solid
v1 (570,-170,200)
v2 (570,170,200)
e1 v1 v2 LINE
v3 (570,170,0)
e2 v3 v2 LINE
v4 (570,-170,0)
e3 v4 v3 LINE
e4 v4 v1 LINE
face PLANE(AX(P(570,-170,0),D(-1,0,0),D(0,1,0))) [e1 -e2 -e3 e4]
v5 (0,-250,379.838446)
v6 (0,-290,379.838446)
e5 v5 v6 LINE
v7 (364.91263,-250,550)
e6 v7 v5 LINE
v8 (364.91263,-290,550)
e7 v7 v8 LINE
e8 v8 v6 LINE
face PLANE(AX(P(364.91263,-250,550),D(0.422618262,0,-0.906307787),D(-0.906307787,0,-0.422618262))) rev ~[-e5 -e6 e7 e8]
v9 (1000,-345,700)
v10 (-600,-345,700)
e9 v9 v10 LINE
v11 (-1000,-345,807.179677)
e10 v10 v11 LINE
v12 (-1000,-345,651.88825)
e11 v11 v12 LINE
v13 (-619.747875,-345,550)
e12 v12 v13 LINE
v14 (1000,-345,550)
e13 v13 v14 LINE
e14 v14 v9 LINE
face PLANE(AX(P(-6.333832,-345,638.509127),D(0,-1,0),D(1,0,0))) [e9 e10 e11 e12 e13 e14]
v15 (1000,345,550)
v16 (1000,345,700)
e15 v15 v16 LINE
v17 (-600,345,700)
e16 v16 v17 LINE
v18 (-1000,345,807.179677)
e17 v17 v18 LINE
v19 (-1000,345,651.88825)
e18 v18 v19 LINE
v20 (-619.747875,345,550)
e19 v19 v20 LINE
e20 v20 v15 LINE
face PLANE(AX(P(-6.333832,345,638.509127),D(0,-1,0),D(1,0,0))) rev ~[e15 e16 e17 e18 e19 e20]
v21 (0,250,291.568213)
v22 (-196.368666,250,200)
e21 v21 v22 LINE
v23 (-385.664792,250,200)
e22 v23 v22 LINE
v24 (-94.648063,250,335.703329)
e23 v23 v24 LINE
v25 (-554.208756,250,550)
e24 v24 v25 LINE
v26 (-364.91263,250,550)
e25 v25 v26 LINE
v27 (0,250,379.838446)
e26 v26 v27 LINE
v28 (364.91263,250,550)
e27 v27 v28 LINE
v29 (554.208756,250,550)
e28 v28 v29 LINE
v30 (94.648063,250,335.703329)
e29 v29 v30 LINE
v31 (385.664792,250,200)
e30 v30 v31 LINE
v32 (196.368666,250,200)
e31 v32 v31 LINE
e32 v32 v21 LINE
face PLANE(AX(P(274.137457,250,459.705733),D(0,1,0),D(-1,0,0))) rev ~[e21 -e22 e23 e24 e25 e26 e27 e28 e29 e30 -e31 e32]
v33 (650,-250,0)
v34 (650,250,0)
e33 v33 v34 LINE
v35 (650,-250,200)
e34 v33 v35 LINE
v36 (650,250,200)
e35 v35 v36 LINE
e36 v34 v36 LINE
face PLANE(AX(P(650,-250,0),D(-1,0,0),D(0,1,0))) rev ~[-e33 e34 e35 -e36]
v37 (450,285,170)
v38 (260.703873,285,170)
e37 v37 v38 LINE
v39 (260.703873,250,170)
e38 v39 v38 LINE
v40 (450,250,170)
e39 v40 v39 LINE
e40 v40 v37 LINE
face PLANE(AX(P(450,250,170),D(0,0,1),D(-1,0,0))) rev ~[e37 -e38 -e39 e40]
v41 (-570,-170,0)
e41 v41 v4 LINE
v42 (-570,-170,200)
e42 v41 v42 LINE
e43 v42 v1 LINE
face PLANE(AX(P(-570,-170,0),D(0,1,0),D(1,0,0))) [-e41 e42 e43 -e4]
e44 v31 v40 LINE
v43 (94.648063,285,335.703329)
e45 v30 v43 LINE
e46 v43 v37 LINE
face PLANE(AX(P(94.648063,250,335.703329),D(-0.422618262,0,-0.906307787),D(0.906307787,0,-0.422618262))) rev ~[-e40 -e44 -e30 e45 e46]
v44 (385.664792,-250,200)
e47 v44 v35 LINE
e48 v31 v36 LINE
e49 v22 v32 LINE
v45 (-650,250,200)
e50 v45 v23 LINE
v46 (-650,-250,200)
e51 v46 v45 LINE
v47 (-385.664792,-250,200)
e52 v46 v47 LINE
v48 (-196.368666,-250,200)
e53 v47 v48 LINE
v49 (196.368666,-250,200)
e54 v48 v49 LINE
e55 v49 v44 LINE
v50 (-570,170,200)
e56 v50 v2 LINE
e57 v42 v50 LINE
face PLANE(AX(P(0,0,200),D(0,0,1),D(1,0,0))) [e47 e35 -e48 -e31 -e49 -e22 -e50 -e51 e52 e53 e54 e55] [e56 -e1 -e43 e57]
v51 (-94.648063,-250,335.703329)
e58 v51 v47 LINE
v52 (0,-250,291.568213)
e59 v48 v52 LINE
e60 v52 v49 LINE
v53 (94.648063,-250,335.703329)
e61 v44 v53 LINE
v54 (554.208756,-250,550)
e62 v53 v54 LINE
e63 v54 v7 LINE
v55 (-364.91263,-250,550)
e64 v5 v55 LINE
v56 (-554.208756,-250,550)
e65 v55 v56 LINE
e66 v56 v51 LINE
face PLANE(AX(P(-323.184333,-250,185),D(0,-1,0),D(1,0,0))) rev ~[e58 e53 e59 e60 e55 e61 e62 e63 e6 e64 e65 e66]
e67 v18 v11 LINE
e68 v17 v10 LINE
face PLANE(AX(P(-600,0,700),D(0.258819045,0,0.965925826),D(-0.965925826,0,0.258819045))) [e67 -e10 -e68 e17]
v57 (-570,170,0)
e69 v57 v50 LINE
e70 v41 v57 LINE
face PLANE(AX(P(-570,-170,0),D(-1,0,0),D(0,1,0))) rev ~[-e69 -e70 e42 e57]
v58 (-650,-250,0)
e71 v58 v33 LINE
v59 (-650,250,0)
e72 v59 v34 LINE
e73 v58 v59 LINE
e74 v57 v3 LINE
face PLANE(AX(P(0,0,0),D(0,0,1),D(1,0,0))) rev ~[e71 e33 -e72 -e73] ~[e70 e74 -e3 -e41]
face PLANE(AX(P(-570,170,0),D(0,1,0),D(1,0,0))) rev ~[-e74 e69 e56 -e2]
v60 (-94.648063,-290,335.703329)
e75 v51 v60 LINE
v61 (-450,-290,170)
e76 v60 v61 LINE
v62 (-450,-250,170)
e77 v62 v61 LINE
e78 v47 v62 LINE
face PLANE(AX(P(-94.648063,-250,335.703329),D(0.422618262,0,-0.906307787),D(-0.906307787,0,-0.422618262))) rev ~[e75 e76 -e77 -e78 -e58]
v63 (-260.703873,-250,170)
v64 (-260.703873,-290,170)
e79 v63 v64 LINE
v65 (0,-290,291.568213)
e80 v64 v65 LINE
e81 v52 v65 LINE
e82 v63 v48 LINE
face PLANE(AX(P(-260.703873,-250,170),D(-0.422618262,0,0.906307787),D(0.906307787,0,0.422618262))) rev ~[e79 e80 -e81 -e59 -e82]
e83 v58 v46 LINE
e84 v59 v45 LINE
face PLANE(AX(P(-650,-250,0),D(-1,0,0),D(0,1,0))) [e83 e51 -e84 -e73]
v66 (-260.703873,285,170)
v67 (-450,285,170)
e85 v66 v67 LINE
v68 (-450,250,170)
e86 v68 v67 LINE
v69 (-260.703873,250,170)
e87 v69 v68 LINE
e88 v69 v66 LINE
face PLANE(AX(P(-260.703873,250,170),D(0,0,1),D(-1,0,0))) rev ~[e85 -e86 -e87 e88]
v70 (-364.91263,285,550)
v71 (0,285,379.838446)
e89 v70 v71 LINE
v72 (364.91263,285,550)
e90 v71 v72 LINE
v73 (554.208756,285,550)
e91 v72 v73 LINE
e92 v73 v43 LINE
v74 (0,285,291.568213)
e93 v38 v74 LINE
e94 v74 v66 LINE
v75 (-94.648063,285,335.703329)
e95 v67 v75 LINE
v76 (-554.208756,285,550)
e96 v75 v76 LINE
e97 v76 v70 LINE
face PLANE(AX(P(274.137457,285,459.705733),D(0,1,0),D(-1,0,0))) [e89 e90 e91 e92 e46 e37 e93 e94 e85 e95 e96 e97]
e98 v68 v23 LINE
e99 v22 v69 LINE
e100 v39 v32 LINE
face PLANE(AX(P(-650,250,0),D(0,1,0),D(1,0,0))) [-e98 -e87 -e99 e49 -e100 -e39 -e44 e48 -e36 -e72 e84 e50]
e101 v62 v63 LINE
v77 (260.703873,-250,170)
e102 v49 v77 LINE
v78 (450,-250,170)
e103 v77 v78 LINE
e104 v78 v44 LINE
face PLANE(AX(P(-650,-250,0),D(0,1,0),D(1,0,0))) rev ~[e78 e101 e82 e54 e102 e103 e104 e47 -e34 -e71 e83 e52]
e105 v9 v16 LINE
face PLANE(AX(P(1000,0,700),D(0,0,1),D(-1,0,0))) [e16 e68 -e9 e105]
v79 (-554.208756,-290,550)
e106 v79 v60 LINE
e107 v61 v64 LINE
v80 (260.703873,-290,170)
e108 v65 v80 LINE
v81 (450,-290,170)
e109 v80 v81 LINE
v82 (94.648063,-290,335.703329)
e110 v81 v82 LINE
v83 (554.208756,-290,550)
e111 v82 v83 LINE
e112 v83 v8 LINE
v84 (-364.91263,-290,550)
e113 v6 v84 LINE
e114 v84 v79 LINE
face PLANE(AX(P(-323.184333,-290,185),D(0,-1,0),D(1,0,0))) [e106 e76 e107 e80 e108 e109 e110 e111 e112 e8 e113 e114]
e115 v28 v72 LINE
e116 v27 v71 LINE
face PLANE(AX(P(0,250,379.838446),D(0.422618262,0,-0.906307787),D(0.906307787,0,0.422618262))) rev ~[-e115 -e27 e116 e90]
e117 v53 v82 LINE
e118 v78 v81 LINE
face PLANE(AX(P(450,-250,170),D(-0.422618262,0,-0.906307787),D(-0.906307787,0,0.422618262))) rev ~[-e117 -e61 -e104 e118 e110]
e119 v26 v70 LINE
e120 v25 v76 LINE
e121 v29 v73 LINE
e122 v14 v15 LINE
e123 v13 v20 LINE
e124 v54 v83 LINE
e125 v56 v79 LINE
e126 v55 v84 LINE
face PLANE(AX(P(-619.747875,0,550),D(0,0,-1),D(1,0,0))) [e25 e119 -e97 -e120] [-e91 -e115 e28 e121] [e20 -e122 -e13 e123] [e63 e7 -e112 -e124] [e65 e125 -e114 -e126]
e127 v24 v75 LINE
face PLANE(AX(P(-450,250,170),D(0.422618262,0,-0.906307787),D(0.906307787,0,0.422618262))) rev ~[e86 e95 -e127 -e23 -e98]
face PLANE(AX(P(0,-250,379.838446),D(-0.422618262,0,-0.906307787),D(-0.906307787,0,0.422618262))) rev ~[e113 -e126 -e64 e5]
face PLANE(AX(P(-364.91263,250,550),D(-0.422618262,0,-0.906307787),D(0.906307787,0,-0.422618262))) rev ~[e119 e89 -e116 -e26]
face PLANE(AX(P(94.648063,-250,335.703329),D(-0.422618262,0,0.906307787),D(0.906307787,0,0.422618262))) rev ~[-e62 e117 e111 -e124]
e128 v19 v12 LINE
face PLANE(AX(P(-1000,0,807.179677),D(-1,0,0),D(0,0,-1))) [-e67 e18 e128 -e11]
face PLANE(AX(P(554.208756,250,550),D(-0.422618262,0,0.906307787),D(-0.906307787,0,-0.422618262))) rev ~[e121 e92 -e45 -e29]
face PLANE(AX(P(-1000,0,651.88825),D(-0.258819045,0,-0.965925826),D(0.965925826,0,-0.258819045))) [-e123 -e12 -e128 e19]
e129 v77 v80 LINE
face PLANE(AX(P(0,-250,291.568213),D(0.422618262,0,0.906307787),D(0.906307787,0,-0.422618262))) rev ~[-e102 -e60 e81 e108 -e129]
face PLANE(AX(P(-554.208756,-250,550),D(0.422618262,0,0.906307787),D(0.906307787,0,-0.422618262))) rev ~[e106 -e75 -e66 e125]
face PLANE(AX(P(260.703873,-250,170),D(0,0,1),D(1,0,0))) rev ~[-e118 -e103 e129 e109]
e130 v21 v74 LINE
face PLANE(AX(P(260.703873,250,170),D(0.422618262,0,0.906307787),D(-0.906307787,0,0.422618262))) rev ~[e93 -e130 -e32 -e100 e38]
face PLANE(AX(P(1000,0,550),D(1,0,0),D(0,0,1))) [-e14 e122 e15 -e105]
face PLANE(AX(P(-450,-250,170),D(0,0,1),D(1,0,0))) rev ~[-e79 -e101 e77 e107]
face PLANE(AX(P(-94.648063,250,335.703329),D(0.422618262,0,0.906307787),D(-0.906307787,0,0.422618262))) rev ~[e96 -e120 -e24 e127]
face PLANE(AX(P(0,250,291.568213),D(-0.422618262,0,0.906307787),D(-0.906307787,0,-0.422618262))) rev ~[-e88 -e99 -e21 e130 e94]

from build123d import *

# Parameters (mm, degrees)
F0_W     = 1300
F0_H     = 500
F0_W_2   = 1140
F0_H_2   = 340
F1_DEPTH = 200
F3_DEPTH = 345
F5_DEPTH = 40
F7_DEPTH = 35


# Not quite as in the source:
# - a feature names something its author has since deleted; it is built from what else it names


with BuildPart() as f1:
    # F0 (on Top) → F1 (new body)
    with BuildSketch(Plane.XY):
        Rectangle(F0_W, F0_H)
        Rectangle(F0_W_2, F0_H_2, mode=Mode.SUBTRACT)
    extrude(amount=F1_DEPTH)



with BuildPart() as f3:
    # F2 (on Front) → F3 (new body, symmetric)
    with BuildSketch(Plane.XZ):
        Polygon((1000, 700), (-600, 700), (-1000, 807.1796769724), (-1000, 651.8882499109), (-619.7478746381, 550), (1000, 550), align=None)
    extrude(amount=F3_DEPTH, both=True)


with BuildPart() as f1_1:
    add(f1.part)

    add(f3.part)  # F5 merges F3
    # F4 (on face) → F5 (join)
    with BuildSketch(Plane.XZ.offset(250)):
        Polygon((-385.6647923847, 200), (-450, 170), (-260.7038733478, 170), (-196.3686657325, 200), align=None)
        Polygon((-94.6480633261, 335.7033294112), (-385.6647923847, 200), (-196.3686657325, 200), (0, 291.5682126528), align=None)
        Polygon((-554.2087564458, 550), (-94.6480633261, 335.7033294112), (0, 379.8384461697), (-364.9126297936, 550), align=None)
        Polygon((0, 379.8384461697), (-94.6480633261, 335.7033294112), (0, 291.5682126528), (94.6480633261, 335.7033294112), align=None)
        Polygon((364.9126297936, 550), (0, 379.8384461697), (94.6480633261, 335.7033294112), (554.2087564458, 550), align=None)
        Polygon((94.6480633261, 335.7033294112), (0, 291.5682126528), (196.3686657325, 200), (385.6647923847, 200), align=None)
        Polygon((385.6647923847, 200), (196.3686657325, 200), (260.7038733478, 170), (450, 170), align=None)
    extrude(amount=F5_DEPTH)

    # F6 (on face) → F7 (join)
    with BuildSketch(Plane(origin=(0, 250, 0), x_dir=(-1, 0, 0), z_dir=(0, 1, 0))):
        Polygon((-554.2087564458, 550), (-94.6480633261, 335.7033294113), (0, 379.8384461697), (-364.9126297936, 550), align=None)
        Polygon((364.9126297936, 550), (0, 379.8384461697), (94.6480633261, 335.7033294113), (554.2087564458, 550), align=None)
        Polygon((0, 379.8384461697), (-94.6480633261, 335.7033294113), (0, 291.5682126528), (94.6480633261, 335.7033294113), align=None)
        Polygon((-94.6480633261, 335.7033294113), (-385.6647923847, 200), (-196.3686657325, 200), (0, 291.5682126528), align=None)
        Polygon((94.6480633261, 335.7033294113), (0, 291.5682126528), (196.3686657325, 200), (385.6647923847, 200), align=None)
        Polygon((385.6647923847, 200), (196.3686657325, 200), (260.7038733478, 170), (450, 170), align=None)
        Polygon((-385.6647923847, 200), (-450, 170), (-260.7038733478, 170), (-196.3686657325, 200), align=None)
    extrude(amount=F7_DEPTH)


solid = f1_1.part
